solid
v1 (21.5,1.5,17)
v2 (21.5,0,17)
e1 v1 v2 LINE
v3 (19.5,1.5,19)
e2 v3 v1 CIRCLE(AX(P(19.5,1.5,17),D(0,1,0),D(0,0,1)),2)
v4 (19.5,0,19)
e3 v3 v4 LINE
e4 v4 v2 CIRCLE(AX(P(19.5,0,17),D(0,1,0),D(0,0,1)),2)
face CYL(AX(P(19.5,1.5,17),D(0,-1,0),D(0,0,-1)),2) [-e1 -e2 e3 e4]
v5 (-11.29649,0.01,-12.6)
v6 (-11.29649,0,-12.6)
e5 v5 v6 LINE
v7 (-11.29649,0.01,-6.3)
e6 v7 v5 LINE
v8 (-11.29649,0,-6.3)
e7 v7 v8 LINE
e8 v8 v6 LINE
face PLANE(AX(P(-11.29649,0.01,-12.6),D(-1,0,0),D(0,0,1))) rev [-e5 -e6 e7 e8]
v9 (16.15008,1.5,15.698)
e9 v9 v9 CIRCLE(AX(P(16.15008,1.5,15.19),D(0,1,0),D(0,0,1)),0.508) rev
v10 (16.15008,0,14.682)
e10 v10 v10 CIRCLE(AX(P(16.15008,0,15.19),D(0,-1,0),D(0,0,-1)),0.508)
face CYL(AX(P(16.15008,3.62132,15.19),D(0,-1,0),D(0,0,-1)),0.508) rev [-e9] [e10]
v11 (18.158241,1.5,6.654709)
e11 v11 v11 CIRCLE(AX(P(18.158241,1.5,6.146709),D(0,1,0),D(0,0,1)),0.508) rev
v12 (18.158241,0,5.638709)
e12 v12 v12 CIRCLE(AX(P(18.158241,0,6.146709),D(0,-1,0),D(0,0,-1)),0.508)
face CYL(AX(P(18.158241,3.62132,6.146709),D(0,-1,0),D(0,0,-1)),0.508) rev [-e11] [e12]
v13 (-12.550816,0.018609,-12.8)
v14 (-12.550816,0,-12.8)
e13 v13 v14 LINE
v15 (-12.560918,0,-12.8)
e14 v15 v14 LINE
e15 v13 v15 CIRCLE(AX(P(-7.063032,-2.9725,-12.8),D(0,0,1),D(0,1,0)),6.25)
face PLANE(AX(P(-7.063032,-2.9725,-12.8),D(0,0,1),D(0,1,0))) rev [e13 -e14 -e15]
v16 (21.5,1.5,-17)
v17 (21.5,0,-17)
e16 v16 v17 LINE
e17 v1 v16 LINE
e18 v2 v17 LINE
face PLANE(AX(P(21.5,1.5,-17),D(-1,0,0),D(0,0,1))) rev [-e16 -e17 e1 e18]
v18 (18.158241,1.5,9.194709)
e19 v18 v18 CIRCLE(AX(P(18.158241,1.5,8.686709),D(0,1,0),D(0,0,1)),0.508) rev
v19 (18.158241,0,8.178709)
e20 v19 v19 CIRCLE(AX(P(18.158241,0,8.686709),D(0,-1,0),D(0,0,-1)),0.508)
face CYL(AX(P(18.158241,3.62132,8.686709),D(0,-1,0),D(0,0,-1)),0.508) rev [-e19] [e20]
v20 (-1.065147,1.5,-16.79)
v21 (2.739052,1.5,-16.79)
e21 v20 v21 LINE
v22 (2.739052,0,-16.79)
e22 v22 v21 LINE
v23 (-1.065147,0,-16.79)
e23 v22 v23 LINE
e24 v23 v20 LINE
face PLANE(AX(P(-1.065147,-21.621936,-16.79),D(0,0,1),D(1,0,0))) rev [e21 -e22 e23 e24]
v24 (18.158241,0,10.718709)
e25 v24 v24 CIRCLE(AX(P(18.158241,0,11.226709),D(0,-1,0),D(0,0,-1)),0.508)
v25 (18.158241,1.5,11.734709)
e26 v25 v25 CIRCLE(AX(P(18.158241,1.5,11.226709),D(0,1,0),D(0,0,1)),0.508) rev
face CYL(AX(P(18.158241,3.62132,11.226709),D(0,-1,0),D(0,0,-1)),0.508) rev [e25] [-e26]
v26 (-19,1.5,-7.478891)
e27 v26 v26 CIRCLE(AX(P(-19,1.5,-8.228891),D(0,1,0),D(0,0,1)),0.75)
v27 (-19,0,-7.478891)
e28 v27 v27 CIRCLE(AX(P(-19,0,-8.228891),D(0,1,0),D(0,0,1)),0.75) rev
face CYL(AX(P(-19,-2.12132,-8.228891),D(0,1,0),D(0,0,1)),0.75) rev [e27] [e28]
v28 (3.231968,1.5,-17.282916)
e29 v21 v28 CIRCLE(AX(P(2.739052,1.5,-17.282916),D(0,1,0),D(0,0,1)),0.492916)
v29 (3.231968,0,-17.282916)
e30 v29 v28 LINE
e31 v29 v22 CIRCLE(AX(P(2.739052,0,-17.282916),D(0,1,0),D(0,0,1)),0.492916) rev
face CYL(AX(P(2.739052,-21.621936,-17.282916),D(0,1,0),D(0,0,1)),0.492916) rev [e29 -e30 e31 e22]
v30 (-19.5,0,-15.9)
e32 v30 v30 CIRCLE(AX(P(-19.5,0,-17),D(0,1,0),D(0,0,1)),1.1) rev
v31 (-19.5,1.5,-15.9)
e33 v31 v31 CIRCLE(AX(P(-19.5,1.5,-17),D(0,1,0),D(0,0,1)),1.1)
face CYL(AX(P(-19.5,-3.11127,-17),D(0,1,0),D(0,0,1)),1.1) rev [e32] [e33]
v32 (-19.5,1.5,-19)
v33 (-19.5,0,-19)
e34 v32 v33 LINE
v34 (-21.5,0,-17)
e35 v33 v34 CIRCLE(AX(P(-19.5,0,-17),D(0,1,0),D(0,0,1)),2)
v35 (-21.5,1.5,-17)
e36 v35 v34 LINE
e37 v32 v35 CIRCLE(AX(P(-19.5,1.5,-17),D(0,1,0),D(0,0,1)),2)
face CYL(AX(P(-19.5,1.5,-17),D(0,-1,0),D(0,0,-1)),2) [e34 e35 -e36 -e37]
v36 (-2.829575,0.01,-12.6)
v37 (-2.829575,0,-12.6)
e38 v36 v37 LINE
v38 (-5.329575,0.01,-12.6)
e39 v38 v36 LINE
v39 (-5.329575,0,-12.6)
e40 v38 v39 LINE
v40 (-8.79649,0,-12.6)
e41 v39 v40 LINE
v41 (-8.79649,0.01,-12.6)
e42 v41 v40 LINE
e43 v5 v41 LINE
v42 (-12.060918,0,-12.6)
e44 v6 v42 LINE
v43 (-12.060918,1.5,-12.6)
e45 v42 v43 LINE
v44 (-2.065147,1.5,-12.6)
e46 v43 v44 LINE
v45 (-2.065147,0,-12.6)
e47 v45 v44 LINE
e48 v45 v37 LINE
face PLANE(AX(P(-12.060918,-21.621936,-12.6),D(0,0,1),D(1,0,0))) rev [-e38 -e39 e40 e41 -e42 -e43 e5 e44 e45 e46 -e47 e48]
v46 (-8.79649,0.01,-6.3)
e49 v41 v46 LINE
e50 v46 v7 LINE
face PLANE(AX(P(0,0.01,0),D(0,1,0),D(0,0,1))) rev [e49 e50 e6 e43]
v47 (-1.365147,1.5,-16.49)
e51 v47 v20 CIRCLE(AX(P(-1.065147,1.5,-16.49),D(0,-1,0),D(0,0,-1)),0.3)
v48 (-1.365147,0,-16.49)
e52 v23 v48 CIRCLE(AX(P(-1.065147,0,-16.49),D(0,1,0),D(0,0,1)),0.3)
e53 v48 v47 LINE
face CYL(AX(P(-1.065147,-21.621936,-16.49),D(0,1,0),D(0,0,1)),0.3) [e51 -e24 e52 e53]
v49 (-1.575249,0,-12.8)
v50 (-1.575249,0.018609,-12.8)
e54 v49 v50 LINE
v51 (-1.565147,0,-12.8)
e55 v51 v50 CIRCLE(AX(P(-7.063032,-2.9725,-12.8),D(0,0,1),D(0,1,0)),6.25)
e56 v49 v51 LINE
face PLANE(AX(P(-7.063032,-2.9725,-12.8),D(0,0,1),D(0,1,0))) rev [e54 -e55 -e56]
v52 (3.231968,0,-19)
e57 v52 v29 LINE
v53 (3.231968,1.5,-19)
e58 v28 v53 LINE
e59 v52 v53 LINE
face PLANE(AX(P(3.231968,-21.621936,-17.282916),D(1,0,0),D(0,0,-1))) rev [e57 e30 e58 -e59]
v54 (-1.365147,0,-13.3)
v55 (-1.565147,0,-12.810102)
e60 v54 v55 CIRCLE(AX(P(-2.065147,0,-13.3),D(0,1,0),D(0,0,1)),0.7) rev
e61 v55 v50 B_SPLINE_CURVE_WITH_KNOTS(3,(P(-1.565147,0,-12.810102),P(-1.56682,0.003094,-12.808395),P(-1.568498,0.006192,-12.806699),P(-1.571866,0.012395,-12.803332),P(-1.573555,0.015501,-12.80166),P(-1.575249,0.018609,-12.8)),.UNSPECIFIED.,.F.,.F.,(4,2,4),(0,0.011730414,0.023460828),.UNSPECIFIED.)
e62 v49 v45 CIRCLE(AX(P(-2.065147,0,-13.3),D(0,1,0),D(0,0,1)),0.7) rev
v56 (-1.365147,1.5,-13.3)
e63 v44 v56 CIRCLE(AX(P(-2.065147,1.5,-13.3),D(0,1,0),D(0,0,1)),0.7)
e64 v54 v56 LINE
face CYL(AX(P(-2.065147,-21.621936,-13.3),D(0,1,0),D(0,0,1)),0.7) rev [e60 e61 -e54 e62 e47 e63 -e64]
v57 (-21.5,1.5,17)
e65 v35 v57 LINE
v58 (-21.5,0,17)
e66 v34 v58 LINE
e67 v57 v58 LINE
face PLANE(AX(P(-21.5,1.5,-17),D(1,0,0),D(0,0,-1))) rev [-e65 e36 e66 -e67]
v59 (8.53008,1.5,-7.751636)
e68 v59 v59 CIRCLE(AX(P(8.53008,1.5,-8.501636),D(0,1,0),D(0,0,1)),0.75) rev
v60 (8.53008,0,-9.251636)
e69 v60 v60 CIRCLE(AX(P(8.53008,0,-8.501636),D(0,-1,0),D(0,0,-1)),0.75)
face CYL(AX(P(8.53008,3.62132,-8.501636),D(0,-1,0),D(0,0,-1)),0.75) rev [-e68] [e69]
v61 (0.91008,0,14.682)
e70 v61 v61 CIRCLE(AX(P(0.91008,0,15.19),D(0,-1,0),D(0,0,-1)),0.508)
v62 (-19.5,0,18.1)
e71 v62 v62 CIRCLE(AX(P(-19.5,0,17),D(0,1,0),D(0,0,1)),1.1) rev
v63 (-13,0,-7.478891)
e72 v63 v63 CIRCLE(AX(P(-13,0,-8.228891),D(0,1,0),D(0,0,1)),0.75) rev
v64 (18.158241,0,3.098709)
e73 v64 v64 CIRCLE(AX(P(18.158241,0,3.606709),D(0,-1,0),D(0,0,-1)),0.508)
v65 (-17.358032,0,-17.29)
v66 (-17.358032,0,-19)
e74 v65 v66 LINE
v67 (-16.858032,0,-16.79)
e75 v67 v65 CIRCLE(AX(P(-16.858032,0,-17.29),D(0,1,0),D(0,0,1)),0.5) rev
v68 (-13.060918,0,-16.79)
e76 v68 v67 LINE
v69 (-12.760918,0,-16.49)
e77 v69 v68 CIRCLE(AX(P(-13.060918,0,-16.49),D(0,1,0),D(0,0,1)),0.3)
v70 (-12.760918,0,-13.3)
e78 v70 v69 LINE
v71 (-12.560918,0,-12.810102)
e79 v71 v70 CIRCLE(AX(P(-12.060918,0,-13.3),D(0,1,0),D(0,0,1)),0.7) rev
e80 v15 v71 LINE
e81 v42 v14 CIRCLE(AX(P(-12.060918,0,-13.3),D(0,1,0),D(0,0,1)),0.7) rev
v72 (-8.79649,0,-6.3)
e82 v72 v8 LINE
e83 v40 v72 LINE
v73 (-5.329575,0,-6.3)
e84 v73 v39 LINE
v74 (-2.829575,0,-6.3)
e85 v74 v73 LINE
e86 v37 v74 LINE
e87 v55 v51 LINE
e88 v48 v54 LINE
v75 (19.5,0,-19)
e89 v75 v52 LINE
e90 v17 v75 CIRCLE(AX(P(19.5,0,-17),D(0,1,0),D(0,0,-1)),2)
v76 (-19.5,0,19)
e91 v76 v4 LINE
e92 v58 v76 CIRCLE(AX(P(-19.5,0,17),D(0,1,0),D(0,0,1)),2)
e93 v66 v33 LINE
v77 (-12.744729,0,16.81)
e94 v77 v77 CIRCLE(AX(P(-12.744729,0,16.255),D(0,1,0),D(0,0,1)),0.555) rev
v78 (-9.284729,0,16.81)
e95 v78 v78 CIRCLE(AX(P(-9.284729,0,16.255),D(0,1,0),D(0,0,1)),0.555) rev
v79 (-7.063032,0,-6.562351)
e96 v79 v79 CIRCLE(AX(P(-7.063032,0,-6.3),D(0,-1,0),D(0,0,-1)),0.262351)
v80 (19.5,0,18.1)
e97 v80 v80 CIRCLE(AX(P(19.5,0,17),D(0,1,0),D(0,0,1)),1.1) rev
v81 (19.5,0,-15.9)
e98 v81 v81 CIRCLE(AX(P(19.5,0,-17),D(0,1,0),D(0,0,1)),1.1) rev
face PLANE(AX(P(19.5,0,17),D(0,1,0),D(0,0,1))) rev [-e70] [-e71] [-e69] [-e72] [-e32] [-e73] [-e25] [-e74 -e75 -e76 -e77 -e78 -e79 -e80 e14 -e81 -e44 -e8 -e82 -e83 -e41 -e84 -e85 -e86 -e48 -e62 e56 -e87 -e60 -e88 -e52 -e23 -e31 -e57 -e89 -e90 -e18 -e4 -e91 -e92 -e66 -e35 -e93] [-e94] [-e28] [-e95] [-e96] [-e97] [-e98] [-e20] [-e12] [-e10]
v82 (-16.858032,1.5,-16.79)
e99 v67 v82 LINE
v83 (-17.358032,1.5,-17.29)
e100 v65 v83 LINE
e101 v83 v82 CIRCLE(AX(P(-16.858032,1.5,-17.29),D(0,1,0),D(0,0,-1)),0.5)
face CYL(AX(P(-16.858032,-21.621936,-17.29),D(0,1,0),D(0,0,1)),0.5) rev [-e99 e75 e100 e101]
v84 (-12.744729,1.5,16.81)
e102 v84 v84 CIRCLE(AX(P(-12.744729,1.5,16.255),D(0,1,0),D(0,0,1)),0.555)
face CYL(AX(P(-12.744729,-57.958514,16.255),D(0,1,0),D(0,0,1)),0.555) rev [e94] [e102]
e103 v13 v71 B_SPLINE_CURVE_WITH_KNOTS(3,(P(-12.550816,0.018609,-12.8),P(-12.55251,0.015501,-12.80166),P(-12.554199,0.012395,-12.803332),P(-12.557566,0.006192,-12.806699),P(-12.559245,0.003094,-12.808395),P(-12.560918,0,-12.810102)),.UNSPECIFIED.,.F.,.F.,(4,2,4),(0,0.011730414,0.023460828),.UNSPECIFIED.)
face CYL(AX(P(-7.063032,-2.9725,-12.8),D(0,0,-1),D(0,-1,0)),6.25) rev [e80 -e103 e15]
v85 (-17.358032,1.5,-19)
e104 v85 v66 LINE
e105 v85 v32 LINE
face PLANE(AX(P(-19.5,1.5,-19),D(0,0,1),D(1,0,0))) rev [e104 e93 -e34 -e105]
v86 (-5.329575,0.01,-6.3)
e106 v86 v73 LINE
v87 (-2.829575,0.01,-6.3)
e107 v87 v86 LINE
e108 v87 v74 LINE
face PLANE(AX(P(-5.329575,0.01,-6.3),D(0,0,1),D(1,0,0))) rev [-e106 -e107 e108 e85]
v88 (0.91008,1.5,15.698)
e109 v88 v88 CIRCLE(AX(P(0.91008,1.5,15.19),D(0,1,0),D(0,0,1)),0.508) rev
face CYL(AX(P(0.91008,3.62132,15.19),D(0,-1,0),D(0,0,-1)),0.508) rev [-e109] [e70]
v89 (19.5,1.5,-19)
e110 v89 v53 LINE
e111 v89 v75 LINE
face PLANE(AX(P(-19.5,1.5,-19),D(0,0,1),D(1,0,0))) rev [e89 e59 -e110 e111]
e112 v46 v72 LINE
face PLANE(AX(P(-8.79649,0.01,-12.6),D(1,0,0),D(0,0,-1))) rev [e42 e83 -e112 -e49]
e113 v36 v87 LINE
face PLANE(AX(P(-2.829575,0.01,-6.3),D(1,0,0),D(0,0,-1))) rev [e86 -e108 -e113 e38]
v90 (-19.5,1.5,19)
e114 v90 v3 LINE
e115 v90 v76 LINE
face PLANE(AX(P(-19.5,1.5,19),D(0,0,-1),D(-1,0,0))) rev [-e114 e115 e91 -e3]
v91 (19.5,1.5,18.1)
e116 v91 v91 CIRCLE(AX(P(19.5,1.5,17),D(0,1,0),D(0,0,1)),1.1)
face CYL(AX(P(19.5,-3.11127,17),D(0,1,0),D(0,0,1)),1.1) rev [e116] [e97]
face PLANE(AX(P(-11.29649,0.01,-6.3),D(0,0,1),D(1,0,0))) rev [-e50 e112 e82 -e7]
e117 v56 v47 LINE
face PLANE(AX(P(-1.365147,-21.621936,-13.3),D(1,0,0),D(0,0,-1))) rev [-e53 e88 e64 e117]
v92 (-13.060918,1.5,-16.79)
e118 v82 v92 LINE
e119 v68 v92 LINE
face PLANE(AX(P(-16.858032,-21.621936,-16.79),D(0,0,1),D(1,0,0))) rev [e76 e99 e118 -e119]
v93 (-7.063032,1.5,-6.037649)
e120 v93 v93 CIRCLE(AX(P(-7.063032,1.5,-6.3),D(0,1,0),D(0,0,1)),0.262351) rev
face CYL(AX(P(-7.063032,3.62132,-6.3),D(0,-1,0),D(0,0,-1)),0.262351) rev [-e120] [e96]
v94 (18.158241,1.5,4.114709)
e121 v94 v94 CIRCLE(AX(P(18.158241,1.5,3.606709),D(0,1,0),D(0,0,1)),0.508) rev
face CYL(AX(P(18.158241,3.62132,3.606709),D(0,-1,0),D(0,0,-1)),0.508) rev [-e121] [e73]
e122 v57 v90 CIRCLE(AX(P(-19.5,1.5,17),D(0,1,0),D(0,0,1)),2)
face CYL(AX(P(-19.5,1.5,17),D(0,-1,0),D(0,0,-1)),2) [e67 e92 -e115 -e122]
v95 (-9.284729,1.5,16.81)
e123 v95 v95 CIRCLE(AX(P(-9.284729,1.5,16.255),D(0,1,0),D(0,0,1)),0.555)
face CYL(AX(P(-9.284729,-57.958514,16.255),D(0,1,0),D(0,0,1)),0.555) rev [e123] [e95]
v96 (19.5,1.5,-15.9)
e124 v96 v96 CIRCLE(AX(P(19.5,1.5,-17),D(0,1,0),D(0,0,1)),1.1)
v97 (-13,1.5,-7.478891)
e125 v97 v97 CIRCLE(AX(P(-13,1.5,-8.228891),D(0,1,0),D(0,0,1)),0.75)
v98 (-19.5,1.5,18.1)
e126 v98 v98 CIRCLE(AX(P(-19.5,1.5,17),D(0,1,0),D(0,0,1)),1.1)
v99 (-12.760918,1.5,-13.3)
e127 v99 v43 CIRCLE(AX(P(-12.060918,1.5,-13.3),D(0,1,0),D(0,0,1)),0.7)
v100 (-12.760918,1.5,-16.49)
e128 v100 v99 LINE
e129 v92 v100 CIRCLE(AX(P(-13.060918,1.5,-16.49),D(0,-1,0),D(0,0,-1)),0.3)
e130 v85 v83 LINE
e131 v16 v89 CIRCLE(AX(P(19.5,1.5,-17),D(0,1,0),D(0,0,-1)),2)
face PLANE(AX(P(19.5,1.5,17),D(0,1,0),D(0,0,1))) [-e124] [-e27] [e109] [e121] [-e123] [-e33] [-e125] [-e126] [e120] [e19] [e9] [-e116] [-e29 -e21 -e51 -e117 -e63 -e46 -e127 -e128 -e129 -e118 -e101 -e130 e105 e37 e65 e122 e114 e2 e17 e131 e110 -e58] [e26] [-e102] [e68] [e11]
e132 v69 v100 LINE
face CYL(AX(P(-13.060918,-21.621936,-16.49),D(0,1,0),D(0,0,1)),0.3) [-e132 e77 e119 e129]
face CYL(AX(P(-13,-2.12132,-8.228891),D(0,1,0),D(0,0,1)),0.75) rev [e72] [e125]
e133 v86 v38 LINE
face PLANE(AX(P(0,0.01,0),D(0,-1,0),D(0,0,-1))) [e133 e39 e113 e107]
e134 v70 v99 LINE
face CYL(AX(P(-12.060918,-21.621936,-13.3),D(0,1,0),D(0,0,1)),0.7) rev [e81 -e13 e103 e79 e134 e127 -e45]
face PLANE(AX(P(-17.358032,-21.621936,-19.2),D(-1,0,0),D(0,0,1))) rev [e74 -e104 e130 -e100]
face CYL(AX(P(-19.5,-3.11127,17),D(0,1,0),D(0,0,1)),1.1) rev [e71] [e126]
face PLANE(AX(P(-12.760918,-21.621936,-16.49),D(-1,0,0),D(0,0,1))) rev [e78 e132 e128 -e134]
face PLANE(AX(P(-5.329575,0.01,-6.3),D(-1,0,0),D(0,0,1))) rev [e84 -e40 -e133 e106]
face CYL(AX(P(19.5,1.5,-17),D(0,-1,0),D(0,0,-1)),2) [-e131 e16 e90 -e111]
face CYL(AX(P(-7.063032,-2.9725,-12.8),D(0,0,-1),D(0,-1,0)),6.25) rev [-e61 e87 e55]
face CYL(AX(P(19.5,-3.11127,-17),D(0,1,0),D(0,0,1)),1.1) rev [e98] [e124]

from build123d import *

# Parameters (mm, degrees)
BOSS_EXTRUDE1_DEPTH = 1.5
CAVITY1_START       = -19
CAVITY1_DEPTH       = 6.2
CAVITY1_2_DEPTH     = 2.01
CUT_EXTRUDE3_REACH  = 30.732
SKETCH5_R           = 1.1
CUT_EXTRUDE6_DEPTH  = 1.5
SKETCH6_W           = 2.5
SKETCH6_H           = 6.3
CUT_EXTRUDE7_DEPTH  = 0.01
SKETCH7_R           = 0.75
CUT_EXTRUDE8_DEPTH  = 1.5
SKETCH8_OUTSIDE_W   = 56.48
SKETCH8_OUTSIDE_H   = 51.48
SKETCH8_OUTSIDE_R   = 0.555
CUT_EXTRUDE9_DEPTH  = 1.5
SKETCH9_R           = 0.75
SKETCH9_R_2         = 0.508
SKETCH9_R_3         = 0.262351118
CUT_EXTRUDE10_DEPTH = 1.5


# Read off the part's stored shape, not the designer's step: Cavity1
with BuildPart() as part:
    # Sketch1 → Boss-Extrude1 (new body)
    with BuildSketch(Plane(origin=(0, 0, 0), x_dir=(1, 0, 0), z_dir=(0, 1, 0))):
        with BuildLine():
            Line((-19.5, 19), (19.5, 19))
            ThreePointArc((19.5, 19), (20.914213562, 18.414213562), (21.5, 17))
            Line((21.5, 17), (21.5, -17))
            ThreePointArc((21.5, -17), (20.914213562, -18.414213562), (19.5, -19))
            Line((19.5, -19), (-19.5, -19))
            ThreePointArc((-19.5, -19), (-20.914213562, -18.414213562), (-21.5, -17))
            Line((-21.5, -17), (-21.5, 17))
            ThreePointArc((-21.5, 17), (-20.914213562, 18.414213562), (-19.5, 19))
        make_face()
    extrude(amount=BOSS_EXTRUDE1_DEPTH)

    # Cavity1 outline → Cavity1 (cut)
    with BuildSketch(Plane.XY.offset(CAVITY1_START)):
        with BuildLine():
            ThreePointArc((-11.428721681, 1.5), (-12.051521733, 0.792798554), (-12.560917691, 0))
            Line((-12.560917691, 0), (-1.565146914, 0))
            ThreePointArc((-1.565146914, 0), (-2.074542872, 0.792798554), (-2.697342924, 1.5))
            Line((-2.697342924, 1.5), (-11.428721681, 1.5))
        make_face()
    extrude(amount=CAVITY1_DEPTH, mode=Mode.SUBTRACT)

    # Cavity1 2 outline → Cavity1 2 (cut)
    with BuildSketch(Plane.XY.offset(CAVITY1_START)):
        with BuildLine():
            Line((-17.158032303, 1.5), (-17.158032303, 0))
            Line((-17.158032303, 0), (-12.560917691, 0))
            ThreePointArc((-12.560917691, 0), (-12.051521733, 0.792798554), (-11.428721681, 1.5))
            Line((-11.428721681, 1.5), (-17.158032303, 1.5))
        make_face()
        with BuildLine():
            ThreePointArc((-2.697342924, 1.5), (-2.074542872, 0.792798554), (-1.565146914, 0))
            Line((-1.565146914, 0), (3.031967697, 0))
            Line((3.031967697, 0), (3.031967697, 1.5))
            Line((3.031967697, 1.5), (-2.697342924, 1.5))
        make_face()
    extrude(amount=CAVITY1_2_DEPTH, mode=Mode.SUBTRACT)

    # Cut-Extrude3: up to this face of the body (flat: up to its plane)
    cut_extrude3_end = Plane(part.part.faces().sort_by_distance((0.396422331, 0, 0.917486048))[0])
    # Sketch4 → Cut-Extrude3 (cut, up to the picked face)
    with BuildSketch(Plane(origin=(0, 1.5, 0), x_dir=(1, 0, 0), z_dir=(0, 1, 0)), mode=Mode.PRIVATE) as cut_extrude3_sk1:
        with BuildLine():
            Line((-16.858032303, 16.79), (-13.060917691, 16.79))
            ThreePointArc((-13.060917691, 16.79), (-12.848785657, 16.702132034), (-12.760917691, 16.49))
            Line((-12.760917691, 16.49), (-12.760917691, 13.3))
            ThreePointArc((-12.760917691, 13.3), (-12.555892438, 12.805025253), (-12.060917691, 12.6))
            Line((-12.060917691, 12.6), (-2.065146914, 12.6))
            ThreePointArc((-2.065146914, 12.6), (-1.570172167, 12.805025253), (-1.365146914, 13.3))
            Line((-1.365146914, 13.3), (-1.365146914, 16.49))
            ThreePointArc((-1.365146914, 16.49), (-1.277278948, 16.702132034), (-1.065146914, 16.79))
            Line((-1.065146914, 16.79), (2.739051684, 16.79))
            ThreePointArc((2.739051684, 16.79), (3.08759594, 16.934371758), (3.231967697, 17.282916013))
            Line((3.231967697, 17.282916013), (3.231967697, 19.2))
            Line((3.231967697, 19.2), (-17.358032303, 19.2))
            Line((-17.358032303, 19.2), (-17.358032303, 17.29))
            ThreePointArc((-17.358032303, 17.29), (-17.211585693, 16.936446609), (-16.858032303, 16.79))
        make_face()
    cut_extrude3_tool1 = split(extrude(cut_extrude3_sk1.sketch, amount=-CUT_EXTRUDE3_REACH, mode=Mode.PRIVATE), bisect_by=cut_extrude3_end, keep=Keep.BOTH, mode=Mode.PRIVATE)
    add(cut_extrude3_tool1.solids().sort_by(Axis((-7.062875, 1.5, -16.384158), (0, -1, 0)))[0], mode=Mode.SUBTRACT)

    # Sketch5 → Cut-Extrude6 (cut)
    with BuildSketch(Plane(origin=(0, 1.5, 0), x_dir=(1, 0, 0), z_dir=(0, 1, 0))):
        with Locations(Location((19.5, 17, 0), (0, 0, 270))):
            Circle(SKETCH5_R)
        with Locations(Location((19.5, -17, 0), (0, 0, 270))):
            Circle(SKETCH5_R)
        with Locations(Location((-19.5, 17, 0), (0, 0, 270))):
            Circle(SKETCH5_R)
        with Locations(Location((-19.5, -17, 0), (0, 0, 270))):
            Circle(SKETCH5_R)
    extrude(amount=-CUT_EXTRUDE6_DEPTH, mode=Mode.SUBTRACT)

    # Sketch6 → Cut-Extrude7 (cut)
    with BuildSketch(Plane.XZ):
        with Locations((-10.046489819, -9.45)):
            Rectangle(SKETCH6_W, SKETCH6_H)
        with Locations((-4.079574786, -9.45)):
            Rectangle(SKETCH6_W, SKETCH6_H)
    extrude(amount=-CUT_EXTRUDE7_DEPTH, mode=Mode.SUBTRACT)

    # Sketch7 → Cut-Extrude8 (cut)
    with BuildSketch(Plane(origin=(0, 1.5, 0), x_dir=(1, 0, 0), z_dir=(0, 1, 0))):
        with Locations(Location((-13, 8.22889094, 0), (0, 0, 270))):
            Circle(SKETCH7_R)
        with Locations(Location((-19, 8.22889094, 0), (0, 0, 270))):
            Circle(SKETCH7_R)
    extrude(amount=-CUT_EXTRUDE8_DEPTH, mode=Mode.SUBTRACT)

    # Sketch8 outside → Cut-Extrude9 (cut)
    # profile 1 of 3: a face of its own
    with BuildSketch(Plane(origin=(0, 1.5, 0), x_dir=(1, 0, 0), z_dir=(0, 1, 0))):
        Rectangle(SKETCH8_OUTSIDE_W, SKETCH8_OUTSIDE_H)
        with BuildLine():
            Line((-17.358032303, 17.29), (-17.358032303, 19))
            Line((-17.358032303, 19), (-19.5, 19))
            ThreePointArc((-19.5, 19), (-20.914213562, 18.414213562), (-21.5, 17))
            Line((-21.5, 17), (-21.5, -17))
            ThreePointArc((-21.5, -17), (-20.914213562, -18.414213562), (-19.5, -19))
            Line((-19.5, -19), (19.5, -19))
            ThreePointArc((19.5, -19), (20.914213562, -18.414213562), (21.5, -17))
            Line((21.5, -17), (21.5, 17))
            ThreePointArc((21.5, 17), (20.914213562, 18.414213562), (19.5, 19))
            Line((19.5, 19), (3.231967697, 19))
            Line((3.231967697, 19), (3.231967697, 17.282916013))
            ThreePointArc((3.231967697, 17.282916013), (3.08759594, 16.934371758), (2.739051684, 16.79))
            Line((2.739051684, 16.79), (-1.065146914, 16.79))
            ThreePointArc((-1.065146914, 16.79), (-1.277278948, 16.702132034), (-1.365146914, 16.49))
            Line((-1.365146914, 16.49), (-1.365146914, 13.3))
            ThreePointArc((-1.365146914, 13.3), (-1.570172167, 12.805025253), (-2.065146914, 12.6))
            Line((-2.065146914, 12.6), (-12.060917691, 12.6))
            ThreePointArc((-12.060917691, 12.6), (-12.555892438, 12.805025253), (-12.760917691, 13.3))
            Line((-12.760917691, 13.3), (-12.760917691, 16.49))
            ThreePointArc((-12.760917691, 16.49), (-12.848785657, 16.702132034), (-13.060917691, 16.79))
            Line((-13.060917691, 16.79), (-16.858032303, 16.79))
            ThreePointArc((-16.858032303, 16.79), (-17.211585693, 16.936446609), (-17.358032303, 17.29))
        make_face(mode=Mode.SUBTRACT)
    # profile 2 of 3: a face of its own
    with BuildSketch(Plane(origin=(0, 1.5, 0), x_dir=(1, 0, 0), z_dir=(0, 1, 0))):
        with Locations(Location((-12.744728974, -16.255, 0), (0, 0, 270))):
            Circle(SKETCH8_OUTSIDE_R)
    # profile 3 of 3: a face of its own
    with BuildSketch(Plane(origin=(0, 1.5, 0), x_dir=(1, 0, 0), z_dir=(0, 1, 0))):
        with Locations(Location((-9.284728974, -16.255, 0), (0, 0, 270))):
            Circle(SKETCH8_OUTSIDE_R)
    extrude(amount=-CUT_EXTRUDE9_DEPTH, mode=Mode.SUBTRACT)

    # Sketch9 → Cut-Extrude10 (cut)
    with BuildSketch(Plane.XZ):
        with Locations(Location((8.53007963, -8.501636461, 0), (0, 0, 270))):
            Circle(SKETCH9_R)
        with Locations(Location((18.158240781, 11.226709095, 0), (0, 0, 270))):
            Circle(SKETCH9_R_2)
        with Locations(Location((18.158240781, 8.686709095, 0), (0, 0, 270))):
            Circle(SKETCH9_R_2)
        with Locations(Location((18.158240781, 6.146709095, 0), (0, 0, 270))):
            Circle(SKETCH9_R_2)
        with Locations(Location((18.158240781, 3.606709095, 0), (0, 0, 270))):
            Circle(SKETCH9_R_2)
        with Locations(Location((16.15007963, 15.19, 0), (0, 0, 270))):
            Circle(SKETCH9_R_2)
        with Locations(Location((-7.063032303, -6.3, 0), (0, 0, 270))):
            Circle(SKETCH9_R_3)
        with Locations(Location((0.91007963, 15.19, 0), (0, 0, 270))):
            Circle(SKETCH9_R_2)
    extrude(amount=-CUT_EXTRUDE10_DEPTH, mode=Mode.SUBTRACT)


solid = part.part
